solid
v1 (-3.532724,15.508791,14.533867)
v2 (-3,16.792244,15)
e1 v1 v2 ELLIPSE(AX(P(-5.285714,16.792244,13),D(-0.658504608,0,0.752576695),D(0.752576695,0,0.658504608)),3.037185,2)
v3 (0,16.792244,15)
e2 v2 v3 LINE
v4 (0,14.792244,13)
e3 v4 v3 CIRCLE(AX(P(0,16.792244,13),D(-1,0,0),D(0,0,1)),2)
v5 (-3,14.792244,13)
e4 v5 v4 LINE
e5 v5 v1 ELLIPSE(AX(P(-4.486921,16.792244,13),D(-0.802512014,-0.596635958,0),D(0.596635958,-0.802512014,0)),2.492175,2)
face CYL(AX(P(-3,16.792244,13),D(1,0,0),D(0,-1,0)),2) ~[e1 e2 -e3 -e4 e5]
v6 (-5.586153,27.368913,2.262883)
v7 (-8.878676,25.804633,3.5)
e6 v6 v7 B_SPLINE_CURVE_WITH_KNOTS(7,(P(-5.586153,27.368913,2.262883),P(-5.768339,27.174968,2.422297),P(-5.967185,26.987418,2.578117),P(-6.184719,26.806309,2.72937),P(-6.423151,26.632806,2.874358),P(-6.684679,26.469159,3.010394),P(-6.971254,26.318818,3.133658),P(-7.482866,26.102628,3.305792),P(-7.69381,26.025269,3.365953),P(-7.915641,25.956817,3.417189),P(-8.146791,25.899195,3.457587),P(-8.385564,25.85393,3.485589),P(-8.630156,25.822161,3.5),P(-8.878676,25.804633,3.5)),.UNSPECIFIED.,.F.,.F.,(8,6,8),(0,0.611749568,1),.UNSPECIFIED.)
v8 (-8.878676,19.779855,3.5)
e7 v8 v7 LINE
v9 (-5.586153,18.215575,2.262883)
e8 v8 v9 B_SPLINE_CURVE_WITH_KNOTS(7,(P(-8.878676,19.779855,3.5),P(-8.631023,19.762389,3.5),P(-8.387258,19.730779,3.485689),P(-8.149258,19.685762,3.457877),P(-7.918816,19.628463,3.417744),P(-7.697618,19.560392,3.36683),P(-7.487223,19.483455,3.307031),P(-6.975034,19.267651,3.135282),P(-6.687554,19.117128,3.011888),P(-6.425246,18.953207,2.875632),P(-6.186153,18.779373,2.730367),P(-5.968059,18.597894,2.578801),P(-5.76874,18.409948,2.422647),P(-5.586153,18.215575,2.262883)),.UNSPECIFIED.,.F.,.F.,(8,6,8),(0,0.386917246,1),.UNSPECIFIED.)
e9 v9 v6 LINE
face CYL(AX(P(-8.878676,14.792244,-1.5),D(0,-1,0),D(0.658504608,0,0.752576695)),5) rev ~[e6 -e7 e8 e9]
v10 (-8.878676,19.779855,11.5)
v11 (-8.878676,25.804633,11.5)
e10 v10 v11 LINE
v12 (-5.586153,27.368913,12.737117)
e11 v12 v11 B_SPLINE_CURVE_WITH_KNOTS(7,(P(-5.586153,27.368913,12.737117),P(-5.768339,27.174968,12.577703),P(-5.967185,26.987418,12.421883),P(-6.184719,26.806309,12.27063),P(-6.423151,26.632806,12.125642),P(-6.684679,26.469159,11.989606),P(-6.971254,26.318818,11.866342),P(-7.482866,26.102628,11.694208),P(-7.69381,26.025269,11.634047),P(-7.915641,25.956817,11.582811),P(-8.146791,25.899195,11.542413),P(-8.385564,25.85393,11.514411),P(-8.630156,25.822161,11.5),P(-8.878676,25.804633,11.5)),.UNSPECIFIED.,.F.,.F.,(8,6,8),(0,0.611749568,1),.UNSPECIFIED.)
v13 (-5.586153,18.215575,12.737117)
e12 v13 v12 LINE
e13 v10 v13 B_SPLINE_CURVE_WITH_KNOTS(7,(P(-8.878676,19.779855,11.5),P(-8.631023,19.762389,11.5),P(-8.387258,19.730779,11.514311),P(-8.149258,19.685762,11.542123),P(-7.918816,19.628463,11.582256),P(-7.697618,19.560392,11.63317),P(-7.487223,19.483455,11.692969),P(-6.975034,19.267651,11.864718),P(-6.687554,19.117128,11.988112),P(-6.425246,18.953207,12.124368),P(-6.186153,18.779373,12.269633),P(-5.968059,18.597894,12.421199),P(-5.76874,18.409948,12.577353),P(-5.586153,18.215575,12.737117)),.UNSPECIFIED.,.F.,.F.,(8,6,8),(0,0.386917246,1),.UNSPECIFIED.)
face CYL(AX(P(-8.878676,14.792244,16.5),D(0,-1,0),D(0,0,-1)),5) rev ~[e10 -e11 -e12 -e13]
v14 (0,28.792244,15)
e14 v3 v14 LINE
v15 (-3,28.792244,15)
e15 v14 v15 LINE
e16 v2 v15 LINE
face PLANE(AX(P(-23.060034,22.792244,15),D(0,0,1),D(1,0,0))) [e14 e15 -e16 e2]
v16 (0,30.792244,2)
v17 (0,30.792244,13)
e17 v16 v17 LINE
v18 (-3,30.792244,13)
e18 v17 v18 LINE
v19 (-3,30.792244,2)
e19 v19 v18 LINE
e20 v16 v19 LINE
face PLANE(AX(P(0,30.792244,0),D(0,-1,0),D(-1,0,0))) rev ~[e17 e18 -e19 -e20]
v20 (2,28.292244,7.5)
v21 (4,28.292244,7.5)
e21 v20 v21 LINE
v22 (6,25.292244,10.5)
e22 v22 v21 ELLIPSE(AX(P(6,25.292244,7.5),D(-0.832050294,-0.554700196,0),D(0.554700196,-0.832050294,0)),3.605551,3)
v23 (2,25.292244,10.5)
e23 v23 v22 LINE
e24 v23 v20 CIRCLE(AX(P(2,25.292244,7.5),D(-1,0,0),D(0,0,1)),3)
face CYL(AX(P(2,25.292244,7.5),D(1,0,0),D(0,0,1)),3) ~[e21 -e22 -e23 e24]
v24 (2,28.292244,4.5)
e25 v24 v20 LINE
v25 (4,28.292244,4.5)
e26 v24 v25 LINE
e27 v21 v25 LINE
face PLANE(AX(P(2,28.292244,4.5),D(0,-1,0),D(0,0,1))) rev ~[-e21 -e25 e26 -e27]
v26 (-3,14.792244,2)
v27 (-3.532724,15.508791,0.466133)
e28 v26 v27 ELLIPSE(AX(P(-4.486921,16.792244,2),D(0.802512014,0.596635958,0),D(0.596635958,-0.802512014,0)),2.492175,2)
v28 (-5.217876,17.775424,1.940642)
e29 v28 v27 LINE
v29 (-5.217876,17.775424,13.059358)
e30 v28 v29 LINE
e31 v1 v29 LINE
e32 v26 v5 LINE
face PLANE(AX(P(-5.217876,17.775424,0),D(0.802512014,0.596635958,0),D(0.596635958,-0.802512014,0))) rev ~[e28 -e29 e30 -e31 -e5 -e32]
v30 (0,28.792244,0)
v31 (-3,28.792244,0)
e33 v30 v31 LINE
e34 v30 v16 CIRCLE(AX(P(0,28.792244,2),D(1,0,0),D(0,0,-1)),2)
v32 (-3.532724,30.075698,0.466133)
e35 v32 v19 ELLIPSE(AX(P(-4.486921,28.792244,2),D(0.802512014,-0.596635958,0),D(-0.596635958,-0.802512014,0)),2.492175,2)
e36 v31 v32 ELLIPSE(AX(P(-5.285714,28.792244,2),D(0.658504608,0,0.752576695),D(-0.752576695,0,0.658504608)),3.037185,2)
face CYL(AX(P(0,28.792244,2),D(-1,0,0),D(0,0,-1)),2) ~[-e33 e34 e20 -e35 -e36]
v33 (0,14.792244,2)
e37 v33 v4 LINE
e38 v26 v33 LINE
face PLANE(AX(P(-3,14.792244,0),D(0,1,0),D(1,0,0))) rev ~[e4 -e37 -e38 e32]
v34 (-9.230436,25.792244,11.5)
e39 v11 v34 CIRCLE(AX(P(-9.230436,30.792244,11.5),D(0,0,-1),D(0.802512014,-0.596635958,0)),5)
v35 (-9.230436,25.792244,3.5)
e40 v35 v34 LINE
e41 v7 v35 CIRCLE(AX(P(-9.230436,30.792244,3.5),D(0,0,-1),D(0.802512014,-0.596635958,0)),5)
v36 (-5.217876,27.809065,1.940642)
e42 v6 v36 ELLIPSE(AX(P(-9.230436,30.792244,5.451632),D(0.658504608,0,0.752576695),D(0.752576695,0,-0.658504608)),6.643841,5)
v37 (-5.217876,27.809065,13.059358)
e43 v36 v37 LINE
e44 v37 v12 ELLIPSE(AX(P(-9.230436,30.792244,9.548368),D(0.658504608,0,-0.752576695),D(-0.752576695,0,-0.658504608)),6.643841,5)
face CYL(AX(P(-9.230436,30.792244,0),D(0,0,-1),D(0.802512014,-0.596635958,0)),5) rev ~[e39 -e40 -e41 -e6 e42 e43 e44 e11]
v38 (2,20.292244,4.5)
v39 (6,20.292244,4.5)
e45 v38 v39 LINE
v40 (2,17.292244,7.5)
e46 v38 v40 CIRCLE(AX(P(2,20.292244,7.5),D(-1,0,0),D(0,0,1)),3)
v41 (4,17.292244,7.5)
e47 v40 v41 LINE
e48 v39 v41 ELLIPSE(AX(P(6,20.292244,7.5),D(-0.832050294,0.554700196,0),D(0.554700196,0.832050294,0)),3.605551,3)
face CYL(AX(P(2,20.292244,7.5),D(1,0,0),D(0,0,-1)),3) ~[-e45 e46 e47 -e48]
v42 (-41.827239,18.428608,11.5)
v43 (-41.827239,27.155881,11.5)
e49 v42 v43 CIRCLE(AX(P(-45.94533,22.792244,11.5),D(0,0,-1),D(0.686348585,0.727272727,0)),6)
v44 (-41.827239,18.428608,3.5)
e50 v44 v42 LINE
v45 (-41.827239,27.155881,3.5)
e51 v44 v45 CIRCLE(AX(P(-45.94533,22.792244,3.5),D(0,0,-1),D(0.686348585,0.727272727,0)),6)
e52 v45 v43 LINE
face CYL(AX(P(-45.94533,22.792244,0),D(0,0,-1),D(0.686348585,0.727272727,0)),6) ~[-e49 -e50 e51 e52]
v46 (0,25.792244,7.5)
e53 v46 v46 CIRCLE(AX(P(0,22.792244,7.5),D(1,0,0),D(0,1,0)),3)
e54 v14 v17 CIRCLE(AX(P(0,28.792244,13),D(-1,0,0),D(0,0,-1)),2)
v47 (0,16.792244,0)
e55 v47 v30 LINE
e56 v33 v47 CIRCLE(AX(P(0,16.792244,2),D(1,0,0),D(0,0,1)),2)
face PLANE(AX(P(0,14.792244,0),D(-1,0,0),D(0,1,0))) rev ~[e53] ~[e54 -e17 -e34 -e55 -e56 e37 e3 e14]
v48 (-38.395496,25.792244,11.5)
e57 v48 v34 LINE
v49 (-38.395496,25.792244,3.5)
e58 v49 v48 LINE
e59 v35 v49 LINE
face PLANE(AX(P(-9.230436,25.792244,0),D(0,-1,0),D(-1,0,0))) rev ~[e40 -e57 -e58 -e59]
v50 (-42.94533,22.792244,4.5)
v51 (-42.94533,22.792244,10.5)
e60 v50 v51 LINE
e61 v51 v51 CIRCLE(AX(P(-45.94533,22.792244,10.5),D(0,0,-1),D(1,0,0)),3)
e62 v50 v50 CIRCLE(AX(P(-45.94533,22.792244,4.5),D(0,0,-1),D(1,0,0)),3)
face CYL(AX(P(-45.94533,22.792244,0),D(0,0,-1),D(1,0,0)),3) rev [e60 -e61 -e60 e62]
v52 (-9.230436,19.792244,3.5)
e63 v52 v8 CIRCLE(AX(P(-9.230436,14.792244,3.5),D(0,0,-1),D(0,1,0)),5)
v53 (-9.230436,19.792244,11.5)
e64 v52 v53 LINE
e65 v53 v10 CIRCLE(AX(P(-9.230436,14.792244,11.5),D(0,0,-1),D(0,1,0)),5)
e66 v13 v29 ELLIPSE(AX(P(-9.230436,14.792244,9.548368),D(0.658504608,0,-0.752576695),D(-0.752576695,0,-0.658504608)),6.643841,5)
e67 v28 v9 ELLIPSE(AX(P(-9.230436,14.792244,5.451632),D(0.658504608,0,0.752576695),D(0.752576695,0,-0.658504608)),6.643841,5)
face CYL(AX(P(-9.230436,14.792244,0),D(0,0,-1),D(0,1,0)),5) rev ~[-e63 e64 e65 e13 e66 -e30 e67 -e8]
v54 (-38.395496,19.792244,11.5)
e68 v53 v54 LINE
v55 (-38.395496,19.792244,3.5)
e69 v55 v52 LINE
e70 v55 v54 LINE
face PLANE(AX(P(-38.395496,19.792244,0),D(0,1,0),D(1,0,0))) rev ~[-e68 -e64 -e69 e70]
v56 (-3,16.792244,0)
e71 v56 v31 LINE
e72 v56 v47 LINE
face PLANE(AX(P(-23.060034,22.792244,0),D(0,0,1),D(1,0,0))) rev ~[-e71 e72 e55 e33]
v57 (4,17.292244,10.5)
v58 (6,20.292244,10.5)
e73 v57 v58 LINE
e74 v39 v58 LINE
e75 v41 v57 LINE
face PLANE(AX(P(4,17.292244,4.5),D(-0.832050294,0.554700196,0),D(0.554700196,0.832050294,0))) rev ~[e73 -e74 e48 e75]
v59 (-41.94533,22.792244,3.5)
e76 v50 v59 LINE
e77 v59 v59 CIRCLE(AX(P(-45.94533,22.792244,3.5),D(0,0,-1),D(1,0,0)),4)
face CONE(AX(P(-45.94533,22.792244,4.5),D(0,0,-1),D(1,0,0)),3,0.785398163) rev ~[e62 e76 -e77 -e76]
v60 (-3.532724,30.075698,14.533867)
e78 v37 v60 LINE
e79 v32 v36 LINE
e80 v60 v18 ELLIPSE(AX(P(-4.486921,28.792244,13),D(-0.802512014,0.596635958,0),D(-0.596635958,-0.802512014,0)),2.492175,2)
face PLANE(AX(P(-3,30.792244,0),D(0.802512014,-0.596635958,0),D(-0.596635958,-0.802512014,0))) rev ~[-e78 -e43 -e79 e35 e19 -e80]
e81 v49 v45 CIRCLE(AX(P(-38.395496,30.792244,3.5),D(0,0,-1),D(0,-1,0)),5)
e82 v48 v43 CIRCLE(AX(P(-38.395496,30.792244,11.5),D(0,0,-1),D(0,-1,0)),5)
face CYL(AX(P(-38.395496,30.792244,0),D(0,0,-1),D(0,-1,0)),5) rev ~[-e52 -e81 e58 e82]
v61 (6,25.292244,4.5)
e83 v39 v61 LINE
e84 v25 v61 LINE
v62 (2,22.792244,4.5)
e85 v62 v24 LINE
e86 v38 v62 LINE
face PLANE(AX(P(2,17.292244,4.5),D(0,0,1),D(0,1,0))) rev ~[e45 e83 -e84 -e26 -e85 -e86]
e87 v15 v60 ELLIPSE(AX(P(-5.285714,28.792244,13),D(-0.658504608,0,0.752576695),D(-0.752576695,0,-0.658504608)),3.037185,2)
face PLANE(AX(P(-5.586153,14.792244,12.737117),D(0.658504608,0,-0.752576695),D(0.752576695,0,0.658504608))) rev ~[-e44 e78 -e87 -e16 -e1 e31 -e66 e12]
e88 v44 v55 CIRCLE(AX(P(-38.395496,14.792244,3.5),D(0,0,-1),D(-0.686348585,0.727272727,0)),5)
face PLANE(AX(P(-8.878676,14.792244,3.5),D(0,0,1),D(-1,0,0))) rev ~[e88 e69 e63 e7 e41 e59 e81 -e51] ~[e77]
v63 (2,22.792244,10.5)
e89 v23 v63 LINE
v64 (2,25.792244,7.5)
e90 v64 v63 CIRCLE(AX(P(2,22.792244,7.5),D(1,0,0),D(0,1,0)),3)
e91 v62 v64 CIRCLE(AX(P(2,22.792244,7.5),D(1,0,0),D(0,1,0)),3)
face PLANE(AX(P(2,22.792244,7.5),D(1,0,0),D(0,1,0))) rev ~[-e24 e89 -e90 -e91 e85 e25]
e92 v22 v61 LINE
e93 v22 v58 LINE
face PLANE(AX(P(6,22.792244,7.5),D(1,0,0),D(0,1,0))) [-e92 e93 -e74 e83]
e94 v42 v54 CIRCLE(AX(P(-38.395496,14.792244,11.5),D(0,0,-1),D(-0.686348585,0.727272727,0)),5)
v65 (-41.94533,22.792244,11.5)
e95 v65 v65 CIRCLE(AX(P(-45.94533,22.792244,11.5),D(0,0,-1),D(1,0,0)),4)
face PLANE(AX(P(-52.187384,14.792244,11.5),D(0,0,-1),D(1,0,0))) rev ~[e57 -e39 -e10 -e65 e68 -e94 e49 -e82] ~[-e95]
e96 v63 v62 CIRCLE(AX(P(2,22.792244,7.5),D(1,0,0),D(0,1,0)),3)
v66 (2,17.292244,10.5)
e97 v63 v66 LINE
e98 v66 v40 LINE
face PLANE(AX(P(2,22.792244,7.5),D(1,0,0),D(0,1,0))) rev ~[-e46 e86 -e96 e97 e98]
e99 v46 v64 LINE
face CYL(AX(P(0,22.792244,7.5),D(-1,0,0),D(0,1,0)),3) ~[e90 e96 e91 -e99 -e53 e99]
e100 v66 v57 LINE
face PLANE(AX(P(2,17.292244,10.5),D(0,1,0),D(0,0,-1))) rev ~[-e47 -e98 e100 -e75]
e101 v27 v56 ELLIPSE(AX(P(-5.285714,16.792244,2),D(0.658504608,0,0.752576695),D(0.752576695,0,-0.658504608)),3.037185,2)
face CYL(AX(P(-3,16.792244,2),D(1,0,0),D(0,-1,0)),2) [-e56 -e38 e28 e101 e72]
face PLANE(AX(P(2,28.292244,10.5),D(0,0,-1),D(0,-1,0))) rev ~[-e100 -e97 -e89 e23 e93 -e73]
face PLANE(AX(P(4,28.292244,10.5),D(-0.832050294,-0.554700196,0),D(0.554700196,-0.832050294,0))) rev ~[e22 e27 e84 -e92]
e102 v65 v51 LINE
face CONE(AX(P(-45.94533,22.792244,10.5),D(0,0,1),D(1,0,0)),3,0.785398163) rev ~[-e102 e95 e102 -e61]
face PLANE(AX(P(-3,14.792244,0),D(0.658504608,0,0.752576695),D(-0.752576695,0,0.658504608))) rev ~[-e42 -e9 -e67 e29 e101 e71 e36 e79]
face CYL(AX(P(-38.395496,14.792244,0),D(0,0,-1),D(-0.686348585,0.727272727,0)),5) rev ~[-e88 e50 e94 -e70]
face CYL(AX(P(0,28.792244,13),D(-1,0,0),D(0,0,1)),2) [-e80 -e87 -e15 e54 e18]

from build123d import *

# Parameters (mm, degrees)
F0_R      = 3
F1_DEPTH  = 15
F2_R      = 3
F3_DEPTH  = 2
F5_DEPTH  = 4
F7_DEPTH  = 25
F9_DEPTH  = 25
F11_DEPTH = 25
F12_SIZE  = 1
F13_SIZE  = 1
F14_R     = 2
F15_R     = 2
F16_R     = 3


# Not quite as in the source:
# - a feature names something its author has since deleted; it is built from what else it names


with BuildPart() as f1:
    # F0 (on Top) → F1 (new body)
    with BuildSketch(Plane.XY):
        with BuildLine():
            ThreePointArc((-38.3954955959, 25.79224433), (-40.2418679606, 26.1456424436), (-41.8272385211, 27.1558806937))
            ThreePointArc((-41.8272385211, 27.1558806937), (-51.9453300312, 22.79224433), (-41.8272385211, 18.4286079664))
            ThreePointArc((-41.8272385211, 18.4286079664), (-40.2418679606, 19.4388462165), (-38.3954955959, 19.79224433))
            Line((-38.3954955959, 19.79224433), (-9.2304363188, 19.79224433))
            ThreePointArc((-9.2304363188, 19.79224433), (-6.9849852462, 19.2596764203), (-5.2178762474, 17.7754241224))
            Line((-5.2178762474, 17.7754241224), (-3, 14.79224433))
            Line((-3, 14.79224433), (0, 14.79224433))
            Line((0, 14.79224433), (0, 19.79224433))
            Line((0, 19.79224433), (0, 25.79224433))
            Line((0, 25.79224433), (0, 30.79224433))
            Line((0, 30.79224433), (-3, 30.79224433))
            Line((-3, 30.79224433), (-5.2178762474, 27.8090645377))
            ThreePointArc((-5.2178762474, 27.8090645377), (-6.9849852462, 26.3248122398), (-9.2304363188, 25.79224433))
            Line((-9.2304363188, 25.79224433), (-38.3954955959, 25.79224433))
        make_face()
        with Locations((-45.9453300312, 22.79224433)):
            Circle(F0_R, mode=Mode.SUBTRACT)
    extrude(amount=F1_DEPTH)

    # F2 (on face) → F3 (join)
    with BuildSketch(Plane.YZ):
        with Locations((22.79224433, 7.5)):
            Circle(F2_R)
    extrude(amount=F3_DEPTH)

    # F4 (on face) → F5 (join)
    with BuildSketch(Plane.YZ.offset(2)):
        Polygon((17.29224433, 4.5), (26.29224433, 4.5), (28.29224433, 4.5), (28.29224433, 6), (28.29224433, 10.5), (19.29224433, 10.5), (17.29224433, 10.5), (17.29224433, 9), align=None)
    extrude(amount=F5_DEPTH)

    # F6 (on face) → F7 (cut)
    with BuildSketch(Plane(origin=(0, 0, 4.5), x_dir=(1, 0, 0), z_dir=(0, 0, -1))):
        Polygon((6, -17.29224433), (4, -17.29224433), (6, -20.29224433), align=None)
    extrude(amount=-F7_DEPTH, mode=Mode.SUBTRACT)

    # F8 (on face) → F9 (cut)
    with BuildSketch(Plane.XY.offset(10.5)):
        Polygon((6, 28.29224433), (4, 28.29224433), (6, 25.29224433), align=None)
    extrude(amount=-F9_DEPTH, mode=Mode.SUBTRACT)

    # F10 (on face) → F11 (cut)
    with BuildSketch(Plane.XZ.offset(-14.79224433)):
        with BuildLine():
            Line((-52.1873838902, 19.9649333954), (-52.1873838902, 11.5))
            Line((-52.1873838902, 11.5), (-8.8786755805, 11.5))
            ThreePointArc((-8.8786755805, 11.5), (-7.1200422145, 11.8194862799), (-5.5861525412, 12.7371165265))
            Line((-5.5861525412, 12.7371165265), (-3, 15))
            Line((-3, 15), (-3, 19.9649333954))
            Line((-3, 19.9649333954), (-52.1873838902, 19.9649333954))
        make_face()
        with BuildLine():
            Line((-2.2940631025, -5.0414614379), (-3, 0))
            Line((-3, 0), (-5.5861525412, 2.2628834735))
            ThreePointArc((-5.5861525412, 2.2628834735), (-7.1200422145, 3.1805137201), (-8.8786755805, 3.5))
            Line((-8.8786755805, 3.5), (-52.6222039647, 3.5))
            Line((-52.6222039647, 3.5), (-52.6222039647, -5.0414614379))
            Line((-52.6222039647, -5.0414614379), (-2.2940631025, -5.0414614379))
        make_face()
    extrude(amount=-F11_DEPTH, mode=Mode.SUBTRACT)

    # F12
    f12_edges = [f1.edges().sort_by_distance(p)[0] for p in [
        (-48.94533, 22.792244, 11.5),
    ]]
    chamfer(f12_edges, length=F12_SIZE)

    # F13
    f13_edges = [f1.edges().sort_by_distance(p)[0] for p in [
        (-48.94533, 22.792244, 3.5),
    ]]
    chamfer(f13_edges, length=F13_SIZE)

    # F14
    f14_edges = [f1.edges().sort_by_distance(p)[0] for p in [
        (-1.5, 14.792244, 15),
    ]]
    fillet(f14_edges, radius=F14_R)

    # F15
    f15_edges = [f1.edges().sort_by_distance(p)[0] for p in [
        (-1.5, 30.792244, 15),
        (-1.5, 30.792244, 0),
        (-1.5, 14.792244, 0),
    ]]
    fillet(f15_edges, radius=F15_R)

    # F16
    f16_edges = [f1.edges().sort_by_distance(p)[0] for p in [
        (3, 17.292244, 4.5),
        (3, 28.292244, 10.5),
    ]]
    fillet(f16_edges, radius=F16_R)


solid = f1.part
